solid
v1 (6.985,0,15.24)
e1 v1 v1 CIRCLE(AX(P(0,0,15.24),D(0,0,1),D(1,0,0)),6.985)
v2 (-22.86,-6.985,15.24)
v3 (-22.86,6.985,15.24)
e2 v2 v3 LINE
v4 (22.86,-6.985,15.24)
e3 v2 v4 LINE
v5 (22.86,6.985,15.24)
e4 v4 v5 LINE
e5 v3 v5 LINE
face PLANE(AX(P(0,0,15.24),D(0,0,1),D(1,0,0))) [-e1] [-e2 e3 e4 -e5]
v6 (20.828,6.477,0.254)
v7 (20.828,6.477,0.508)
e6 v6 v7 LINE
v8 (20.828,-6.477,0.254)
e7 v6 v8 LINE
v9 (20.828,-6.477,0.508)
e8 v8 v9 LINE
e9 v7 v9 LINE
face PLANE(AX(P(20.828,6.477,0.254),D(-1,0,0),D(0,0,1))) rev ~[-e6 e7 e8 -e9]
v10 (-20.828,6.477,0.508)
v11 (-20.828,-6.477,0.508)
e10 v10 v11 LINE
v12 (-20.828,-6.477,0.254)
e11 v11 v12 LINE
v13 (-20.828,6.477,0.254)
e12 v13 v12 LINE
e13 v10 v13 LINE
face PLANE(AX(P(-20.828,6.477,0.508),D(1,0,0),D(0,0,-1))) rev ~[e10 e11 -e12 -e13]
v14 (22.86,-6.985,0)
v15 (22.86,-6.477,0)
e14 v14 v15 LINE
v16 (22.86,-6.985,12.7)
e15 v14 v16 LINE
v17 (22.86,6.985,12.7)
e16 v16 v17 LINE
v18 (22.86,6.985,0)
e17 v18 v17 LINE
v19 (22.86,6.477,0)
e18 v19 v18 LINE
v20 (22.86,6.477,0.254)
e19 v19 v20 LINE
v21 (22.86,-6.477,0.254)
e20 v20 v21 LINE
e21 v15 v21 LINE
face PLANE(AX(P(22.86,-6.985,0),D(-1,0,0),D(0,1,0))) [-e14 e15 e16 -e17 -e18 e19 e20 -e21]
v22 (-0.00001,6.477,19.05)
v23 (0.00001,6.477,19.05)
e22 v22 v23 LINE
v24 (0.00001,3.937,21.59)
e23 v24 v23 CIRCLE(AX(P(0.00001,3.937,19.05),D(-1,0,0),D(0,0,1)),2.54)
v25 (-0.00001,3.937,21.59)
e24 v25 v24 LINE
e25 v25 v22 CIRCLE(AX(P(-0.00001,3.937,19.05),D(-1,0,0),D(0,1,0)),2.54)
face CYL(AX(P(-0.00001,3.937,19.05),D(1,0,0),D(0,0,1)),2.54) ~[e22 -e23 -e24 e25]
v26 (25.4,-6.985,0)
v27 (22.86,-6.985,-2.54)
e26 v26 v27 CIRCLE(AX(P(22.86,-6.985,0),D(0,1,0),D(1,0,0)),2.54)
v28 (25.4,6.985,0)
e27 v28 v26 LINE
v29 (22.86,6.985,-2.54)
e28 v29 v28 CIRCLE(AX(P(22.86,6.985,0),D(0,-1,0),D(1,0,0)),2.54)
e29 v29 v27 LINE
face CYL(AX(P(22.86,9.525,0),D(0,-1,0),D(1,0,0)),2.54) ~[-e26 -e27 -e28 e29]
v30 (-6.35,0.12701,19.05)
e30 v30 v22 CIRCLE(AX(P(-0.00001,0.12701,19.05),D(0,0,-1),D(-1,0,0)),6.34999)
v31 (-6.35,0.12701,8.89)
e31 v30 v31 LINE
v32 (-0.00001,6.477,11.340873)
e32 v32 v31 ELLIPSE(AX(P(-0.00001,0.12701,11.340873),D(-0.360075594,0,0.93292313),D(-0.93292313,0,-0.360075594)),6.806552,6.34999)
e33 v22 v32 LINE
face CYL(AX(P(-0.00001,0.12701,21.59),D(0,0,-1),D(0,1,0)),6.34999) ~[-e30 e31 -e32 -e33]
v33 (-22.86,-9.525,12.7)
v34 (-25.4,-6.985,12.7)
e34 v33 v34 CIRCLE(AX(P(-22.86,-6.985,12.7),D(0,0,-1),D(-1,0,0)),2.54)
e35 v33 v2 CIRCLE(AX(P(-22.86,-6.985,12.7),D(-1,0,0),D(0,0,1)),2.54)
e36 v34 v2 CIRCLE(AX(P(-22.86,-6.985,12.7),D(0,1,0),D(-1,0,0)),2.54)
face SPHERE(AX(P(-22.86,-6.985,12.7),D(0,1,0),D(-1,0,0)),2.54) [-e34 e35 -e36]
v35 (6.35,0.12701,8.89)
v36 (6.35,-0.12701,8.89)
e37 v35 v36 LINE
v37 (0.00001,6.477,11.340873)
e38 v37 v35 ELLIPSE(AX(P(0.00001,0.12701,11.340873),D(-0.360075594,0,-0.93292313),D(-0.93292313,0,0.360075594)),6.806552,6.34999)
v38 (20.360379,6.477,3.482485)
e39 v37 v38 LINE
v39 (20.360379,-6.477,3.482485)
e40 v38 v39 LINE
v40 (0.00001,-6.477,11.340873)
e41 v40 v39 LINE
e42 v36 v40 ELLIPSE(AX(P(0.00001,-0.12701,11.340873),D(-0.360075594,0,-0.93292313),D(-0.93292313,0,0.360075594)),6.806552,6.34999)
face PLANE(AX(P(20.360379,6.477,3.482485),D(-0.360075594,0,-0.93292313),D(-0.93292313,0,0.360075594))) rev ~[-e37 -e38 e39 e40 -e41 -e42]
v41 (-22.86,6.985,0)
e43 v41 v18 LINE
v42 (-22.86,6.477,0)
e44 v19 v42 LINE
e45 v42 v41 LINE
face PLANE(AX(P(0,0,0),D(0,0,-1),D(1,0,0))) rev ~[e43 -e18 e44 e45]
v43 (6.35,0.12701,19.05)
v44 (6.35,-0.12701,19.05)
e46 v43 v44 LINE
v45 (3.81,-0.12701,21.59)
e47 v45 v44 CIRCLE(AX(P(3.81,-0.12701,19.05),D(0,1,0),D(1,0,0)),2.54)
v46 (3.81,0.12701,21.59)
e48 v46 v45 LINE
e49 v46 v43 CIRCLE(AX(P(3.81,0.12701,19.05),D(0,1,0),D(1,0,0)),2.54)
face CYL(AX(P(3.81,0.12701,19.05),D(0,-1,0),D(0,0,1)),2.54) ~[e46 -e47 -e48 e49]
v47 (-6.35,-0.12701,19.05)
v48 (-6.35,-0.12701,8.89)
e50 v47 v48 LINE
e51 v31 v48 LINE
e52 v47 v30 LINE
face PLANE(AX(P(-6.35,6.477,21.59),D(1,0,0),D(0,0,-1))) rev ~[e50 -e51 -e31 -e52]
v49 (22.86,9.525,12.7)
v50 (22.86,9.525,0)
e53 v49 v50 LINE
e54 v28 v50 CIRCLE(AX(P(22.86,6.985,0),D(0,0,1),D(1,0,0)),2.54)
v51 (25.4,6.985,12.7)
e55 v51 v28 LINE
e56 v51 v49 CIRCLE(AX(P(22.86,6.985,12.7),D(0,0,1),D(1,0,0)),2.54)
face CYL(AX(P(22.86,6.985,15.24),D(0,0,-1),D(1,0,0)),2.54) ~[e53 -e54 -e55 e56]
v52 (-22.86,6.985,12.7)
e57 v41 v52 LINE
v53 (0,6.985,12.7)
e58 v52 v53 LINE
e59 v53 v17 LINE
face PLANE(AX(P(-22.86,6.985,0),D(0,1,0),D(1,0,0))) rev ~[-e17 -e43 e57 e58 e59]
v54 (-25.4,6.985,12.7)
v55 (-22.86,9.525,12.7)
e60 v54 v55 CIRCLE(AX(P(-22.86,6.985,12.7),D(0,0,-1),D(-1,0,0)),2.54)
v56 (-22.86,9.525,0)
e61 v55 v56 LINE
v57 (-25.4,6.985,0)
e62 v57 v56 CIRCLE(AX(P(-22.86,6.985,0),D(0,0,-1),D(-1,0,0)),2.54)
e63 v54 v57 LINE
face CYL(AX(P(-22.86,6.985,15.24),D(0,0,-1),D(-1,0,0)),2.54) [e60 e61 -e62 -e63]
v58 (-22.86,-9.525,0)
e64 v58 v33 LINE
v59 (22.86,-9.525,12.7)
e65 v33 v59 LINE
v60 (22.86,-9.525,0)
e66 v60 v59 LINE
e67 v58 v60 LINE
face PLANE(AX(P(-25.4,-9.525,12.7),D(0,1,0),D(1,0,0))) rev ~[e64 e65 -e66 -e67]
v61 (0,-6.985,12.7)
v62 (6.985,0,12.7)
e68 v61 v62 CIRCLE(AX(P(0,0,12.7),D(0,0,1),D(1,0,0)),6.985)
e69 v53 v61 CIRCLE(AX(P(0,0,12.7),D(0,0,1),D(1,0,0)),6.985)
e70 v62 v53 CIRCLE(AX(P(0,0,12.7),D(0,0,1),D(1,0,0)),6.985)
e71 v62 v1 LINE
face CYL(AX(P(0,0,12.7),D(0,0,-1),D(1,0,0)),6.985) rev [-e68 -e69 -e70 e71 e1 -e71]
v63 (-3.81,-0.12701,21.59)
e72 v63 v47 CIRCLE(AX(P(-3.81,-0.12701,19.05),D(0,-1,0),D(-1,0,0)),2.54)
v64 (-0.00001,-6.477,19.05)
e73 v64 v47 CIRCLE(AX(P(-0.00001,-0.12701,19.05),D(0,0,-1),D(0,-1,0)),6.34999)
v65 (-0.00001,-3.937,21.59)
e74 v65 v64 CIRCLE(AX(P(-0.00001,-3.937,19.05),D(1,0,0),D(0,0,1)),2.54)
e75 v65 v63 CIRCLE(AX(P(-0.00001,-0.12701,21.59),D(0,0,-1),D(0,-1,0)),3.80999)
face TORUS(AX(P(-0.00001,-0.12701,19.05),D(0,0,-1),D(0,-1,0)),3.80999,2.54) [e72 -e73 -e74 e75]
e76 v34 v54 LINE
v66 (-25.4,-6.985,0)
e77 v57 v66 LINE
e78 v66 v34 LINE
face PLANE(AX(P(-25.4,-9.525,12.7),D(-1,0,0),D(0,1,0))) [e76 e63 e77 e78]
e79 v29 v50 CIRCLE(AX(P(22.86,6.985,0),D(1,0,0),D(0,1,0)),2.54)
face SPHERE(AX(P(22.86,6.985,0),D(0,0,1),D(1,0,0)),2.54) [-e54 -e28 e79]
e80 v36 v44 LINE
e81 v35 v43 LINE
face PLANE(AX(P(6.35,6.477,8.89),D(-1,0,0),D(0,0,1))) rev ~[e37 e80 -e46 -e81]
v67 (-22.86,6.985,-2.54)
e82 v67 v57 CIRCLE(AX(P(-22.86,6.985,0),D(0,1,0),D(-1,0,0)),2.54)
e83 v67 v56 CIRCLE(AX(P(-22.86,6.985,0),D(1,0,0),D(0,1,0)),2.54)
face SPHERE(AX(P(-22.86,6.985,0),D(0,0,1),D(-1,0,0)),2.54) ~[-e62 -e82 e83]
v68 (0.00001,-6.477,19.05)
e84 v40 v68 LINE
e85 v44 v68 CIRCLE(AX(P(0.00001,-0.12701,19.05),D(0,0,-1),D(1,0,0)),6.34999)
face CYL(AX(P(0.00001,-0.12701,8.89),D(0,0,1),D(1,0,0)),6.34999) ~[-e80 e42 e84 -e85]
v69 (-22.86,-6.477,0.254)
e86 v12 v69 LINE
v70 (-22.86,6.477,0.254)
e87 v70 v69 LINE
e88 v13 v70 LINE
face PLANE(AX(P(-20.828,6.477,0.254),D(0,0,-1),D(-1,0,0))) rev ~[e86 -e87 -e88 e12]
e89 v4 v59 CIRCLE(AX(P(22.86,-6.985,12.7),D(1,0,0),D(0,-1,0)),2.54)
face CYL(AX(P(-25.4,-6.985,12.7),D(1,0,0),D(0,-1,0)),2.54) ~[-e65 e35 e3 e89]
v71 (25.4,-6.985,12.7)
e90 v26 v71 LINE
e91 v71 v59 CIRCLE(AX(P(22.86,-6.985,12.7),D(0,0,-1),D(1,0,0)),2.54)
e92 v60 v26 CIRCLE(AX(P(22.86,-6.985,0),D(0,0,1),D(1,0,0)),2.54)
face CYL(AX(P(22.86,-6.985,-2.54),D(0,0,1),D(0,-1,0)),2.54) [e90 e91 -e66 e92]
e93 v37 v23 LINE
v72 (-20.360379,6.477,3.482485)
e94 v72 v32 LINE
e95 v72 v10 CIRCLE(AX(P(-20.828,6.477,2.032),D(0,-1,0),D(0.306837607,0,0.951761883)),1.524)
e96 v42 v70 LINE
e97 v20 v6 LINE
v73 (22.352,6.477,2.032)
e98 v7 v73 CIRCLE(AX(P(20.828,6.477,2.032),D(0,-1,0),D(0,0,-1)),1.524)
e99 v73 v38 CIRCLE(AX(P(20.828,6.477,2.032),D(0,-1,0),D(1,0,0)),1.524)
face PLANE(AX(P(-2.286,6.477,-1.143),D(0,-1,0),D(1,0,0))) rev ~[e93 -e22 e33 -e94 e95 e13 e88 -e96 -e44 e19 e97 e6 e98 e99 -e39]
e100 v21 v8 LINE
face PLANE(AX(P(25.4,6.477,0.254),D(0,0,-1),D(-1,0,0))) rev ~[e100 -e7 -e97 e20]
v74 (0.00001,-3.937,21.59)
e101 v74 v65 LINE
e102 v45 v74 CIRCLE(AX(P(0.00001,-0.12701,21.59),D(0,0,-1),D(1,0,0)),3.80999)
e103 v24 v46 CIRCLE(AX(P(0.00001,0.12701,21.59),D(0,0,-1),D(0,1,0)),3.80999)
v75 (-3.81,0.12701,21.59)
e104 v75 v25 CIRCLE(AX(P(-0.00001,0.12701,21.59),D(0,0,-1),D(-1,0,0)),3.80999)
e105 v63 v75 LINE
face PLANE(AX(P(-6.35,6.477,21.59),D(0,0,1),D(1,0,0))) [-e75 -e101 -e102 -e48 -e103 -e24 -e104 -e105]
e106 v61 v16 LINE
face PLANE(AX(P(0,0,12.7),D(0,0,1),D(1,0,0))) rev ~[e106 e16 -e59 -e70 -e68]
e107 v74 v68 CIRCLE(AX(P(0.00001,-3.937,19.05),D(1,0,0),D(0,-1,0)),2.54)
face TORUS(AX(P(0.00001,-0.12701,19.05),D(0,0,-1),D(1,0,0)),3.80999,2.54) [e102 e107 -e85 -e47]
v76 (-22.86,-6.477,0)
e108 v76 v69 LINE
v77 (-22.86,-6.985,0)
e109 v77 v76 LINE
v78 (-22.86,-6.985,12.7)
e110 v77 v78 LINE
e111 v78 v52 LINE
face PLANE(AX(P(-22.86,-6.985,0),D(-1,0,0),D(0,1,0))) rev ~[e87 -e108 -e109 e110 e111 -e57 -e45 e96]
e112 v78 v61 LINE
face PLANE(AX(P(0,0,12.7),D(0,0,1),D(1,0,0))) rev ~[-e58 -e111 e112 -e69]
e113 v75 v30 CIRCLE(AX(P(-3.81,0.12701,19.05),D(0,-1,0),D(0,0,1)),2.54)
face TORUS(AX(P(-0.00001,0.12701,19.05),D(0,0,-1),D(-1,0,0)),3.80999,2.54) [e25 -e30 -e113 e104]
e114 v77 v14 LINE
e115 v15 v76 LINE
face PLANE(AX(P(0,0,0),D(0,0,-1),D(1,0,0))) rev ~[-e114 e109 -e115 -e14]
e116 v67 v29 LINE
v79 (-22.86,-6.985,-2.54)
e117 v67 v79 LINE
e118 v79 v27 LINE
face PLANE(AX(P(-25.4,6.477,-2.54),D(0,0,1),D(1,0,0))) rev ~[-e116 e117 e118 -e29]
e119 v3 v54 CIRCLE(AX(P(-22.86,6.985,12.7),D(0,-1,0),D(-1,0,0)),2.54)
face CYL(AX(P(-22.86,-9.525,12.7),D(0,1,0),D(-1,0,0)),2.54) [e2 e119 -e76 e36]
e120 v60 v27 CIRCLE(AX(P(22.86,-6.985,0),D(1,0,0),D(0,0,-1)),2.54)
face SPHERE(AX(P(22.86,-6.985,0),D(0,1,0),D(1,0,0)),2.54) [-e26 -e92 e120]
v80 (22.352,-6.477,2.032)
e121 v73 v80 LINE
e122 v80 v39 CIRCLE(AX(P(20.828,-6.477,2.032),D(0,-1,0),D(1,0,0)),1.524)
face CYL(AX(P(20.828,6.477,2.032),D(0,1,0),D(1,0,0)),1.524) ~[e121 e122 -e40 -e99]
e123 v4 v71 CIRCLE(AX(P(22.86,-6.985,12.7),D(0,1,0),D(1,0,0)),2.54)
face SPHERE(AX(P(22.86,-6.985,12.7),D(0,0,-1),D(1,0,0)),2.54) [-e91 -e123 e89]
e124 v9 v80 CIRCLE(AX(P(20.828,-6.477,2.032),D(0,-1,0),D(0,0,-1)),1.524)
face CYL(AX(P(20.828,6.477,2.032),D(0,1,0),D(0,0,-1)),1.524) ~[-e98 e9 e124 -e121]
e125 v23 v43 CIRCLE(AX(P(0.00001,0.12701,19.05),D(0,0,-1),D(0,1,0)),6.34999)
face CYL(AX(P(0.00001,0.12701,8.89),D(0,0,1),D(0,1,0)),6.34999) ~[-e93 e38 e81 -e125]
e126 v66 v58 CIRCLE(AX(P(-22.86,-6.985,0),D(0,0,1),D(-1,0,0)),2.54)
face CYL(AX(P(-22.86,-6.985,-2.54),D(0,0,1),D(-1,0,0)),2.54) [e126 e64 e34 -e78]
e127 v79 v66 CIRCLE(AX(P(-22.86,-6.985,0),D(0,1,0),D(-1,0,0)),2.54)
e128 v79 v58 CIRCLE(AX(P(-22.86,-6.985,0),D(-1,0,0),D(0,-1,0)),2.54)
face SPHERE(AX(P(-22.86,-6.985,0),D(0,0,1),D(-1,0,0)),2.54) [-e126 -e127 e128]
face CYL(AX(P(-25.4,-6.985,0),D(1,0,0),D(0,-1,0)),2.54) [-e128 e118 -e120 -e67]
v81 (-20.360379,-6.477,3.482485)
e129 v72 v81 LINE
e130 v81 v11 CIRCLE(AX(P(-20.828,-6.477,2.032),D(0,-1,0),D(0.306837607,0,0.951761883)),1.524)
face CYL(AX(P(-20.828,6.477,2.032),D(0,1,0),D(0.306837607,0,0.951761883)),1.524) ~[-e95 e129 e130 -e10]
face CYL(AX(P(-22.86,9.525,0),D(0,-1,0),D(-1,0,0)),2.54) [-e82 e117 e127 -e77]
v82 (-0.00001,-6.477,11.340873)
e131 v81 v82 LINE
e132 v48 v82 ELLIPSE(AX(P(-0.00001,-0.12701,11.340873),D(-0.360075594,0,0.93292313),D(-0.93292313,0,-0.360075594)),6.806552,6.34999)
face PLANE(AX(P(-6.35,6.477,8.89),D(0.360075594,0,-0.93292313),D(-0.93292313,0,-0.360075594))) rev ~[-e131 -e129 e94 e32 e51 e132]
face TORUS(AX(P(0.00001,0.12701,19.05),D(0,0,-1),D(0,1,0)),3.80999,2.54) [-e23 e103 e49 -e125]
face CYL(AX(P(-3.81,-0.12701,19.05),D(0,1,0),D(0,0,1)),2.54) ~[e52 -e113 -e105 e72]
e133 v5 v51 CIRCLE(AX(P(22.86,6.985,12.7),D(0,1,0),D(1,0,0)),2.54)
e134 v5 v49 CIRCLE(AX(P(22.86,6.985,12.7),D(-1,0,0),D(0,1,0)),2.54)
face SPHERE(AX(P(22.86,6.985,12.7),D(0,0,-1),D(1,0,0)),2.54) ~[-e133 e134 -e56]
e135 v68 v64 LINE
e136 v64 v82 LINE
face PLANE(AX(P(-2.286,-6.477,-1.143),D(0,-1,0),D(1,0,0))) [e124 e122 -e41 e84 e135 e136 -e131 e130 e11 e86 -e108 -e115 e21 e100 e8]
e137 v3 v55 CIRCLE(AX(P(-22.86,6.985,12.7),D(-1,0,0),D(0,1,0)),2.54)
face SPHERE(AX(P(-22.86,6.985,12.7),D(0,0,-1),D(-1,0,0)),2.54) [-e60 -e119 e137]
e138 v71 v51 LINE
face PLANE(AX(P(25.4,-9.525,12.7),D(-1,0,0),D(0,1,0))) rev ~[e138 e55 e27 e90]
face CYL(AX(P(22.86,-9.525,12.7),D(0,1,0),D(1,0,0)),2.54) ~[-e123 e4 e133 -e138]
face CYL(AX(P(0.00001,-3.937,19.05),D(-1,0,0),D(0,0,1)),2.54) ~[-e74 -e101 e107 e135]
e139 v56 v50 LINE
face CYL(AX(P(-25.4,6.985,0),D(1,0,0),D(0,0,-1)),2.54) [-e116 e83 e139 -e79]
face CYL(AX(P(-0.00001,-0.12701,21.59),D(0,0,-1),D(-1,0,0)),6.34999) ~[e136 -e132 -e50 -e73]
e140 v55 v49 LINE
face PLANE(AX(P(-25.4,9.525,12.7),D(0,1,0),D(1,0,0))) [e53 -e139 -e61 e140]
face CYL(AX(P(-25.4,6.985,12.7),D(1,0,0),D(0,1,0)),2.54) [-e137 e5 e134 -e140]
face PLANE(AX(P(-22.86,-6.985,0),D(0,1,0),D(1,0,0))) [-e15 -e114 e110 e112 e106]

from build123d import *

# Parameters (mm, degrees)
F0_W     = 50.8
F0_H     = 19.05
F0_W_2   = 45.72
F0_H_2   = 13.97
F1_DEPTH = 12.7
F2_W     = 50.8
F2_H     = 19.05
F3_DEPTH = 2.54
F5_START = 0.508
F4_W     = 4.572
F4_H     = 2.794
F4_W_2   = 12.7
F4_H_2   = 5.08
F4_H_3   = 3.81
F5_DEPTH = 12.954
F6_R     = 6.34999
F7_W     = 50.8
F7_H     = 19.05
F7_R     = 6.985
F8_DEPTH = 2.54
F9_R     = 2.54
F10_R    = 2.54


# Not quite as in the source:
# - a fillet or chamfer is up to 0.001 mm smaller than in the source, because OpenCascade refuses the exact size


with BuildPart() as f1:
    # F0 (on Top) → F1 (new body)
    with BuildSketch(Plane.XY):
        Rectangle(F0_W, F0_H)
        Rectangle(F0_W_2, F0_H_2, mode=Mode.SUBTRACT)
    extrude(amount=F1_DEPTH)

    # F2 (on face) → F3 (join)
    with BuildSketch(Plane(origin=(0, 0, 0), x_dir=(1, 0, 0), z_dir=(0, 0, -1))):
        Rectangle(F2_W, F2_H)
    extrude(amount=F3_DEPTH)

    # F4 (on face) → F5 (join)
    with BuildSketch(Plane.XZ.offset(-6.985).offset(F5_START)):
        Polygon((-25.4, 0.254), (-25.4, -2.54), (20.828, -2.54), (20.828, 0.254), (-20.828, 0.254), align=None)
        with Locations((23.114, -1.143)):
            Rectangle(F4_W, F4_H)
        with BuildLine():
            Line((-20.828, 0.254), (20.828, 0.254))
            Line((20.828, 0.254), (20.828, 0.508))
            ThreePointArc((20.828, 0.508), (19.7166563034, 0.9891715443), (19.3070802744, 2.1288462099))
            Line((19.3070802744, 2.1288462099), (5.08, 7.62))
            Line((5.08, 7.62), (-5.08, 7.62))
            Line((-5.08, 7.62), (-19.3070802744, 2.1288462099))
            ThreePointArc((-19.3070802744, 2.1288462099), (-19.3047702633, 2.0804475914), (-19.304, 2.032))
            ThreePointArc((-19.304, 2.032), (-19.7503692655, 0.9543692655), (-20.828, 0.508))
            Line((-20.828, 0.508), (-20.828, 0.254))
        make_face()
        with BuildLine():
            ThreePointArc((19.3070802744, 2.1288462099), (19.7166563034, 0.9891715443), (20.828, 0.508))
            Line((20.828, 0.508), (20.828, 2.032))
            Line((20.828, 2.032), (19.558, 2.032))
            Line((19.558, 2.032), (19.3070802744, 2.1288462099))
        make_face()
        with BuildLine():
            Line((20.828, 2.032), (20.828, 0.508))
            ThreePointArc((20.828, 0.508), (21.9056307345, 0.9543692655), (22.352, 2.032))
            ThreePointArc((22.352, 2.032), (21.7251962822, 3.2639151071), (20.3603794867, 3.4824851104))
            Line((20.3603794867, 3.4824851104), (20.828, 3.302))
            Line((20.828, 3.302), (20.828, 2.032))
        make_face()
        with BuildLine():
            ThreePointArc((-20.3603794867, 3.4824851104), (-22.3335091013, 2.2686819509), (-20.828, 0.508))
            Line((-20.828, 0.508), (-20.828, 2.032))
            Line((-20.828, 2.032), (-20.828, 3.302))
            Line((-20.828, 3.302), (-20.3603794867, 3.4824851104))
        make_face()
        with BuildLine():
            Line((-20.828, 2.032), (-20.828, 0.508))
            ThreePointArc((-20.828, 0.508), (-19.7503692655, 0.9543692655), (-19.304, 2.032))
            ThreePointArc((-19.304, 2.032), (-19.3047702633, 2.0804475914), (-19.3070802744, 2.1288462099))
            Line((-19.3070802744, 2.1288462099), (-19.558, 2.032))
            Line((-19.558, 2.032), (-20.828, 2.032))
        make_face()
        with BuildLine():
            Line((19.558, 2.032), (20.828, 2.032))
            Line((20.828, 2.032), (20.828, 3.302))
            Line((20.828, 3.302), (20.3603794867, 3.4824851104))
            ThreePointArc((20.3603794867, 3.4824851104), (19.6252291828, 2.9679051027), (19.3070802744, 2.1288462099))
            Line((19.3070802744, 2.1288462099), (19.558, 2.032))
        make_face()
        with BuildLine():
            Line((5.08, 7.62), (19.3070802744, 2.1288462099))
            ThreePointArc((19.3070802744, 2.1288462099), (19.6252291828, 2.9679051027), (20.3603794867, 3.4824851104))
            Line((20.3603794867, 3.4824851104), (6.35, 8.89))
            Line((6.35, 8.89), (6.35, 7.62))
            Line((6.35, 7.62), (5.08, 7.62))
        make_face()
        with BuildLine():
            Line((-20.828, 3.302), (-20.828, 2.032))
            Line((-20.828, 2.032), (-19.558, 2.032))
            Line((-19.558, 2.032), (-19.3070802744, 2.1288462099))
            ThreePointArc((-19.3070802744, 2.1288462099), (-19.6252291828, 2.9679051027), (-20.3603794867, 3.4824851104))
            Line((-20.3603794867, 3.4824851104), (-20.828, 3.302))
        make_face()
        with BuildLine():
            Line((-6.35, 8.89), (-20.3603794867, 3.4824851104))
            ThreePointArc((-20.3603794867, 3.4824851104), (-19.6252291828, 2.9679051027), (-19.3070802744, 2.1288462099))
            Line((-19.3070802744, 2.1288462099), (-5.08, 7.62))
            Line((-5.08, 7.62), (-6.35, 7.62))
            Line((-6.35, 7.62), (-6.35, 8.89))
        make_face()
        Polygon((-5.08, 7.62), (5.08, 7.62), (6.35, 7.62), (6.35, 8.89), (6.35, 12.7), (-6.35, 12.7), (-6.35, 8.89), (-6.35, 7.62), align=None)
        with Locations((0, 15.24)):
            Rectangle(F4_W_2, F4_H_2)
        with Locations((0, 19.685)):
            Rectangle(F4_W_2, F4_H_3)
    extrude(amount=F5_DEPTH)

    # F6 (radius 6.35 in the source; OpenCascade refuses exactly that, so slightly less here)
    f6_edges = [f1.edges().sort_by_distance(p)[0] for p in [
        (-6.35, -6.477, 15.24),
        (6.35, -6.477, 15.24),
        (6.35, 6.477, 15.24),
        (-6.35, 6.477, 15.24),
    ]]
    fillet(f6_edges, radius=F6_R)

    # F7 (on face) → F8 (join)
    with BuildSketch(Plane.XY.offset(12.7)):
        Rectangle(F7_W, F7_H)
        Circle(F7_R, mode=Mode.SUBTRACT)
    extrude(amount=F8_DEPTH)

    # F9
    f9_edges = [f1.edges().sort_by_distance(p)[0] for p in [
        (-25.4, 9.525, 6.35),
        (-25.4, 0, 15.24),
        (-25.4, -9.525, 6.35),
        (-25.4, 0, -2.54),
        (25.4, 9.525, 6.35),
        (25.4, 0, -2.54),
        (25.4, -9.525, 6.35),
        (25.4, 0, 15.24),
        (0, -9.525, 15.24),
        (0, -9.525, -2.54),
        (0, 9.525, -2.54),
        (0, 9.525, 15.24),
    ]]
    fillet(f9_edges, radius=F9_R)

    # F10
    f10_edges = [f1.edges().sort_by_distance(p)[0] for p in [
        (4.490131, -4.617131, 21.59),
    ]]
    fillet(f10_edges, radius=F10_R)


solid = f1.part
